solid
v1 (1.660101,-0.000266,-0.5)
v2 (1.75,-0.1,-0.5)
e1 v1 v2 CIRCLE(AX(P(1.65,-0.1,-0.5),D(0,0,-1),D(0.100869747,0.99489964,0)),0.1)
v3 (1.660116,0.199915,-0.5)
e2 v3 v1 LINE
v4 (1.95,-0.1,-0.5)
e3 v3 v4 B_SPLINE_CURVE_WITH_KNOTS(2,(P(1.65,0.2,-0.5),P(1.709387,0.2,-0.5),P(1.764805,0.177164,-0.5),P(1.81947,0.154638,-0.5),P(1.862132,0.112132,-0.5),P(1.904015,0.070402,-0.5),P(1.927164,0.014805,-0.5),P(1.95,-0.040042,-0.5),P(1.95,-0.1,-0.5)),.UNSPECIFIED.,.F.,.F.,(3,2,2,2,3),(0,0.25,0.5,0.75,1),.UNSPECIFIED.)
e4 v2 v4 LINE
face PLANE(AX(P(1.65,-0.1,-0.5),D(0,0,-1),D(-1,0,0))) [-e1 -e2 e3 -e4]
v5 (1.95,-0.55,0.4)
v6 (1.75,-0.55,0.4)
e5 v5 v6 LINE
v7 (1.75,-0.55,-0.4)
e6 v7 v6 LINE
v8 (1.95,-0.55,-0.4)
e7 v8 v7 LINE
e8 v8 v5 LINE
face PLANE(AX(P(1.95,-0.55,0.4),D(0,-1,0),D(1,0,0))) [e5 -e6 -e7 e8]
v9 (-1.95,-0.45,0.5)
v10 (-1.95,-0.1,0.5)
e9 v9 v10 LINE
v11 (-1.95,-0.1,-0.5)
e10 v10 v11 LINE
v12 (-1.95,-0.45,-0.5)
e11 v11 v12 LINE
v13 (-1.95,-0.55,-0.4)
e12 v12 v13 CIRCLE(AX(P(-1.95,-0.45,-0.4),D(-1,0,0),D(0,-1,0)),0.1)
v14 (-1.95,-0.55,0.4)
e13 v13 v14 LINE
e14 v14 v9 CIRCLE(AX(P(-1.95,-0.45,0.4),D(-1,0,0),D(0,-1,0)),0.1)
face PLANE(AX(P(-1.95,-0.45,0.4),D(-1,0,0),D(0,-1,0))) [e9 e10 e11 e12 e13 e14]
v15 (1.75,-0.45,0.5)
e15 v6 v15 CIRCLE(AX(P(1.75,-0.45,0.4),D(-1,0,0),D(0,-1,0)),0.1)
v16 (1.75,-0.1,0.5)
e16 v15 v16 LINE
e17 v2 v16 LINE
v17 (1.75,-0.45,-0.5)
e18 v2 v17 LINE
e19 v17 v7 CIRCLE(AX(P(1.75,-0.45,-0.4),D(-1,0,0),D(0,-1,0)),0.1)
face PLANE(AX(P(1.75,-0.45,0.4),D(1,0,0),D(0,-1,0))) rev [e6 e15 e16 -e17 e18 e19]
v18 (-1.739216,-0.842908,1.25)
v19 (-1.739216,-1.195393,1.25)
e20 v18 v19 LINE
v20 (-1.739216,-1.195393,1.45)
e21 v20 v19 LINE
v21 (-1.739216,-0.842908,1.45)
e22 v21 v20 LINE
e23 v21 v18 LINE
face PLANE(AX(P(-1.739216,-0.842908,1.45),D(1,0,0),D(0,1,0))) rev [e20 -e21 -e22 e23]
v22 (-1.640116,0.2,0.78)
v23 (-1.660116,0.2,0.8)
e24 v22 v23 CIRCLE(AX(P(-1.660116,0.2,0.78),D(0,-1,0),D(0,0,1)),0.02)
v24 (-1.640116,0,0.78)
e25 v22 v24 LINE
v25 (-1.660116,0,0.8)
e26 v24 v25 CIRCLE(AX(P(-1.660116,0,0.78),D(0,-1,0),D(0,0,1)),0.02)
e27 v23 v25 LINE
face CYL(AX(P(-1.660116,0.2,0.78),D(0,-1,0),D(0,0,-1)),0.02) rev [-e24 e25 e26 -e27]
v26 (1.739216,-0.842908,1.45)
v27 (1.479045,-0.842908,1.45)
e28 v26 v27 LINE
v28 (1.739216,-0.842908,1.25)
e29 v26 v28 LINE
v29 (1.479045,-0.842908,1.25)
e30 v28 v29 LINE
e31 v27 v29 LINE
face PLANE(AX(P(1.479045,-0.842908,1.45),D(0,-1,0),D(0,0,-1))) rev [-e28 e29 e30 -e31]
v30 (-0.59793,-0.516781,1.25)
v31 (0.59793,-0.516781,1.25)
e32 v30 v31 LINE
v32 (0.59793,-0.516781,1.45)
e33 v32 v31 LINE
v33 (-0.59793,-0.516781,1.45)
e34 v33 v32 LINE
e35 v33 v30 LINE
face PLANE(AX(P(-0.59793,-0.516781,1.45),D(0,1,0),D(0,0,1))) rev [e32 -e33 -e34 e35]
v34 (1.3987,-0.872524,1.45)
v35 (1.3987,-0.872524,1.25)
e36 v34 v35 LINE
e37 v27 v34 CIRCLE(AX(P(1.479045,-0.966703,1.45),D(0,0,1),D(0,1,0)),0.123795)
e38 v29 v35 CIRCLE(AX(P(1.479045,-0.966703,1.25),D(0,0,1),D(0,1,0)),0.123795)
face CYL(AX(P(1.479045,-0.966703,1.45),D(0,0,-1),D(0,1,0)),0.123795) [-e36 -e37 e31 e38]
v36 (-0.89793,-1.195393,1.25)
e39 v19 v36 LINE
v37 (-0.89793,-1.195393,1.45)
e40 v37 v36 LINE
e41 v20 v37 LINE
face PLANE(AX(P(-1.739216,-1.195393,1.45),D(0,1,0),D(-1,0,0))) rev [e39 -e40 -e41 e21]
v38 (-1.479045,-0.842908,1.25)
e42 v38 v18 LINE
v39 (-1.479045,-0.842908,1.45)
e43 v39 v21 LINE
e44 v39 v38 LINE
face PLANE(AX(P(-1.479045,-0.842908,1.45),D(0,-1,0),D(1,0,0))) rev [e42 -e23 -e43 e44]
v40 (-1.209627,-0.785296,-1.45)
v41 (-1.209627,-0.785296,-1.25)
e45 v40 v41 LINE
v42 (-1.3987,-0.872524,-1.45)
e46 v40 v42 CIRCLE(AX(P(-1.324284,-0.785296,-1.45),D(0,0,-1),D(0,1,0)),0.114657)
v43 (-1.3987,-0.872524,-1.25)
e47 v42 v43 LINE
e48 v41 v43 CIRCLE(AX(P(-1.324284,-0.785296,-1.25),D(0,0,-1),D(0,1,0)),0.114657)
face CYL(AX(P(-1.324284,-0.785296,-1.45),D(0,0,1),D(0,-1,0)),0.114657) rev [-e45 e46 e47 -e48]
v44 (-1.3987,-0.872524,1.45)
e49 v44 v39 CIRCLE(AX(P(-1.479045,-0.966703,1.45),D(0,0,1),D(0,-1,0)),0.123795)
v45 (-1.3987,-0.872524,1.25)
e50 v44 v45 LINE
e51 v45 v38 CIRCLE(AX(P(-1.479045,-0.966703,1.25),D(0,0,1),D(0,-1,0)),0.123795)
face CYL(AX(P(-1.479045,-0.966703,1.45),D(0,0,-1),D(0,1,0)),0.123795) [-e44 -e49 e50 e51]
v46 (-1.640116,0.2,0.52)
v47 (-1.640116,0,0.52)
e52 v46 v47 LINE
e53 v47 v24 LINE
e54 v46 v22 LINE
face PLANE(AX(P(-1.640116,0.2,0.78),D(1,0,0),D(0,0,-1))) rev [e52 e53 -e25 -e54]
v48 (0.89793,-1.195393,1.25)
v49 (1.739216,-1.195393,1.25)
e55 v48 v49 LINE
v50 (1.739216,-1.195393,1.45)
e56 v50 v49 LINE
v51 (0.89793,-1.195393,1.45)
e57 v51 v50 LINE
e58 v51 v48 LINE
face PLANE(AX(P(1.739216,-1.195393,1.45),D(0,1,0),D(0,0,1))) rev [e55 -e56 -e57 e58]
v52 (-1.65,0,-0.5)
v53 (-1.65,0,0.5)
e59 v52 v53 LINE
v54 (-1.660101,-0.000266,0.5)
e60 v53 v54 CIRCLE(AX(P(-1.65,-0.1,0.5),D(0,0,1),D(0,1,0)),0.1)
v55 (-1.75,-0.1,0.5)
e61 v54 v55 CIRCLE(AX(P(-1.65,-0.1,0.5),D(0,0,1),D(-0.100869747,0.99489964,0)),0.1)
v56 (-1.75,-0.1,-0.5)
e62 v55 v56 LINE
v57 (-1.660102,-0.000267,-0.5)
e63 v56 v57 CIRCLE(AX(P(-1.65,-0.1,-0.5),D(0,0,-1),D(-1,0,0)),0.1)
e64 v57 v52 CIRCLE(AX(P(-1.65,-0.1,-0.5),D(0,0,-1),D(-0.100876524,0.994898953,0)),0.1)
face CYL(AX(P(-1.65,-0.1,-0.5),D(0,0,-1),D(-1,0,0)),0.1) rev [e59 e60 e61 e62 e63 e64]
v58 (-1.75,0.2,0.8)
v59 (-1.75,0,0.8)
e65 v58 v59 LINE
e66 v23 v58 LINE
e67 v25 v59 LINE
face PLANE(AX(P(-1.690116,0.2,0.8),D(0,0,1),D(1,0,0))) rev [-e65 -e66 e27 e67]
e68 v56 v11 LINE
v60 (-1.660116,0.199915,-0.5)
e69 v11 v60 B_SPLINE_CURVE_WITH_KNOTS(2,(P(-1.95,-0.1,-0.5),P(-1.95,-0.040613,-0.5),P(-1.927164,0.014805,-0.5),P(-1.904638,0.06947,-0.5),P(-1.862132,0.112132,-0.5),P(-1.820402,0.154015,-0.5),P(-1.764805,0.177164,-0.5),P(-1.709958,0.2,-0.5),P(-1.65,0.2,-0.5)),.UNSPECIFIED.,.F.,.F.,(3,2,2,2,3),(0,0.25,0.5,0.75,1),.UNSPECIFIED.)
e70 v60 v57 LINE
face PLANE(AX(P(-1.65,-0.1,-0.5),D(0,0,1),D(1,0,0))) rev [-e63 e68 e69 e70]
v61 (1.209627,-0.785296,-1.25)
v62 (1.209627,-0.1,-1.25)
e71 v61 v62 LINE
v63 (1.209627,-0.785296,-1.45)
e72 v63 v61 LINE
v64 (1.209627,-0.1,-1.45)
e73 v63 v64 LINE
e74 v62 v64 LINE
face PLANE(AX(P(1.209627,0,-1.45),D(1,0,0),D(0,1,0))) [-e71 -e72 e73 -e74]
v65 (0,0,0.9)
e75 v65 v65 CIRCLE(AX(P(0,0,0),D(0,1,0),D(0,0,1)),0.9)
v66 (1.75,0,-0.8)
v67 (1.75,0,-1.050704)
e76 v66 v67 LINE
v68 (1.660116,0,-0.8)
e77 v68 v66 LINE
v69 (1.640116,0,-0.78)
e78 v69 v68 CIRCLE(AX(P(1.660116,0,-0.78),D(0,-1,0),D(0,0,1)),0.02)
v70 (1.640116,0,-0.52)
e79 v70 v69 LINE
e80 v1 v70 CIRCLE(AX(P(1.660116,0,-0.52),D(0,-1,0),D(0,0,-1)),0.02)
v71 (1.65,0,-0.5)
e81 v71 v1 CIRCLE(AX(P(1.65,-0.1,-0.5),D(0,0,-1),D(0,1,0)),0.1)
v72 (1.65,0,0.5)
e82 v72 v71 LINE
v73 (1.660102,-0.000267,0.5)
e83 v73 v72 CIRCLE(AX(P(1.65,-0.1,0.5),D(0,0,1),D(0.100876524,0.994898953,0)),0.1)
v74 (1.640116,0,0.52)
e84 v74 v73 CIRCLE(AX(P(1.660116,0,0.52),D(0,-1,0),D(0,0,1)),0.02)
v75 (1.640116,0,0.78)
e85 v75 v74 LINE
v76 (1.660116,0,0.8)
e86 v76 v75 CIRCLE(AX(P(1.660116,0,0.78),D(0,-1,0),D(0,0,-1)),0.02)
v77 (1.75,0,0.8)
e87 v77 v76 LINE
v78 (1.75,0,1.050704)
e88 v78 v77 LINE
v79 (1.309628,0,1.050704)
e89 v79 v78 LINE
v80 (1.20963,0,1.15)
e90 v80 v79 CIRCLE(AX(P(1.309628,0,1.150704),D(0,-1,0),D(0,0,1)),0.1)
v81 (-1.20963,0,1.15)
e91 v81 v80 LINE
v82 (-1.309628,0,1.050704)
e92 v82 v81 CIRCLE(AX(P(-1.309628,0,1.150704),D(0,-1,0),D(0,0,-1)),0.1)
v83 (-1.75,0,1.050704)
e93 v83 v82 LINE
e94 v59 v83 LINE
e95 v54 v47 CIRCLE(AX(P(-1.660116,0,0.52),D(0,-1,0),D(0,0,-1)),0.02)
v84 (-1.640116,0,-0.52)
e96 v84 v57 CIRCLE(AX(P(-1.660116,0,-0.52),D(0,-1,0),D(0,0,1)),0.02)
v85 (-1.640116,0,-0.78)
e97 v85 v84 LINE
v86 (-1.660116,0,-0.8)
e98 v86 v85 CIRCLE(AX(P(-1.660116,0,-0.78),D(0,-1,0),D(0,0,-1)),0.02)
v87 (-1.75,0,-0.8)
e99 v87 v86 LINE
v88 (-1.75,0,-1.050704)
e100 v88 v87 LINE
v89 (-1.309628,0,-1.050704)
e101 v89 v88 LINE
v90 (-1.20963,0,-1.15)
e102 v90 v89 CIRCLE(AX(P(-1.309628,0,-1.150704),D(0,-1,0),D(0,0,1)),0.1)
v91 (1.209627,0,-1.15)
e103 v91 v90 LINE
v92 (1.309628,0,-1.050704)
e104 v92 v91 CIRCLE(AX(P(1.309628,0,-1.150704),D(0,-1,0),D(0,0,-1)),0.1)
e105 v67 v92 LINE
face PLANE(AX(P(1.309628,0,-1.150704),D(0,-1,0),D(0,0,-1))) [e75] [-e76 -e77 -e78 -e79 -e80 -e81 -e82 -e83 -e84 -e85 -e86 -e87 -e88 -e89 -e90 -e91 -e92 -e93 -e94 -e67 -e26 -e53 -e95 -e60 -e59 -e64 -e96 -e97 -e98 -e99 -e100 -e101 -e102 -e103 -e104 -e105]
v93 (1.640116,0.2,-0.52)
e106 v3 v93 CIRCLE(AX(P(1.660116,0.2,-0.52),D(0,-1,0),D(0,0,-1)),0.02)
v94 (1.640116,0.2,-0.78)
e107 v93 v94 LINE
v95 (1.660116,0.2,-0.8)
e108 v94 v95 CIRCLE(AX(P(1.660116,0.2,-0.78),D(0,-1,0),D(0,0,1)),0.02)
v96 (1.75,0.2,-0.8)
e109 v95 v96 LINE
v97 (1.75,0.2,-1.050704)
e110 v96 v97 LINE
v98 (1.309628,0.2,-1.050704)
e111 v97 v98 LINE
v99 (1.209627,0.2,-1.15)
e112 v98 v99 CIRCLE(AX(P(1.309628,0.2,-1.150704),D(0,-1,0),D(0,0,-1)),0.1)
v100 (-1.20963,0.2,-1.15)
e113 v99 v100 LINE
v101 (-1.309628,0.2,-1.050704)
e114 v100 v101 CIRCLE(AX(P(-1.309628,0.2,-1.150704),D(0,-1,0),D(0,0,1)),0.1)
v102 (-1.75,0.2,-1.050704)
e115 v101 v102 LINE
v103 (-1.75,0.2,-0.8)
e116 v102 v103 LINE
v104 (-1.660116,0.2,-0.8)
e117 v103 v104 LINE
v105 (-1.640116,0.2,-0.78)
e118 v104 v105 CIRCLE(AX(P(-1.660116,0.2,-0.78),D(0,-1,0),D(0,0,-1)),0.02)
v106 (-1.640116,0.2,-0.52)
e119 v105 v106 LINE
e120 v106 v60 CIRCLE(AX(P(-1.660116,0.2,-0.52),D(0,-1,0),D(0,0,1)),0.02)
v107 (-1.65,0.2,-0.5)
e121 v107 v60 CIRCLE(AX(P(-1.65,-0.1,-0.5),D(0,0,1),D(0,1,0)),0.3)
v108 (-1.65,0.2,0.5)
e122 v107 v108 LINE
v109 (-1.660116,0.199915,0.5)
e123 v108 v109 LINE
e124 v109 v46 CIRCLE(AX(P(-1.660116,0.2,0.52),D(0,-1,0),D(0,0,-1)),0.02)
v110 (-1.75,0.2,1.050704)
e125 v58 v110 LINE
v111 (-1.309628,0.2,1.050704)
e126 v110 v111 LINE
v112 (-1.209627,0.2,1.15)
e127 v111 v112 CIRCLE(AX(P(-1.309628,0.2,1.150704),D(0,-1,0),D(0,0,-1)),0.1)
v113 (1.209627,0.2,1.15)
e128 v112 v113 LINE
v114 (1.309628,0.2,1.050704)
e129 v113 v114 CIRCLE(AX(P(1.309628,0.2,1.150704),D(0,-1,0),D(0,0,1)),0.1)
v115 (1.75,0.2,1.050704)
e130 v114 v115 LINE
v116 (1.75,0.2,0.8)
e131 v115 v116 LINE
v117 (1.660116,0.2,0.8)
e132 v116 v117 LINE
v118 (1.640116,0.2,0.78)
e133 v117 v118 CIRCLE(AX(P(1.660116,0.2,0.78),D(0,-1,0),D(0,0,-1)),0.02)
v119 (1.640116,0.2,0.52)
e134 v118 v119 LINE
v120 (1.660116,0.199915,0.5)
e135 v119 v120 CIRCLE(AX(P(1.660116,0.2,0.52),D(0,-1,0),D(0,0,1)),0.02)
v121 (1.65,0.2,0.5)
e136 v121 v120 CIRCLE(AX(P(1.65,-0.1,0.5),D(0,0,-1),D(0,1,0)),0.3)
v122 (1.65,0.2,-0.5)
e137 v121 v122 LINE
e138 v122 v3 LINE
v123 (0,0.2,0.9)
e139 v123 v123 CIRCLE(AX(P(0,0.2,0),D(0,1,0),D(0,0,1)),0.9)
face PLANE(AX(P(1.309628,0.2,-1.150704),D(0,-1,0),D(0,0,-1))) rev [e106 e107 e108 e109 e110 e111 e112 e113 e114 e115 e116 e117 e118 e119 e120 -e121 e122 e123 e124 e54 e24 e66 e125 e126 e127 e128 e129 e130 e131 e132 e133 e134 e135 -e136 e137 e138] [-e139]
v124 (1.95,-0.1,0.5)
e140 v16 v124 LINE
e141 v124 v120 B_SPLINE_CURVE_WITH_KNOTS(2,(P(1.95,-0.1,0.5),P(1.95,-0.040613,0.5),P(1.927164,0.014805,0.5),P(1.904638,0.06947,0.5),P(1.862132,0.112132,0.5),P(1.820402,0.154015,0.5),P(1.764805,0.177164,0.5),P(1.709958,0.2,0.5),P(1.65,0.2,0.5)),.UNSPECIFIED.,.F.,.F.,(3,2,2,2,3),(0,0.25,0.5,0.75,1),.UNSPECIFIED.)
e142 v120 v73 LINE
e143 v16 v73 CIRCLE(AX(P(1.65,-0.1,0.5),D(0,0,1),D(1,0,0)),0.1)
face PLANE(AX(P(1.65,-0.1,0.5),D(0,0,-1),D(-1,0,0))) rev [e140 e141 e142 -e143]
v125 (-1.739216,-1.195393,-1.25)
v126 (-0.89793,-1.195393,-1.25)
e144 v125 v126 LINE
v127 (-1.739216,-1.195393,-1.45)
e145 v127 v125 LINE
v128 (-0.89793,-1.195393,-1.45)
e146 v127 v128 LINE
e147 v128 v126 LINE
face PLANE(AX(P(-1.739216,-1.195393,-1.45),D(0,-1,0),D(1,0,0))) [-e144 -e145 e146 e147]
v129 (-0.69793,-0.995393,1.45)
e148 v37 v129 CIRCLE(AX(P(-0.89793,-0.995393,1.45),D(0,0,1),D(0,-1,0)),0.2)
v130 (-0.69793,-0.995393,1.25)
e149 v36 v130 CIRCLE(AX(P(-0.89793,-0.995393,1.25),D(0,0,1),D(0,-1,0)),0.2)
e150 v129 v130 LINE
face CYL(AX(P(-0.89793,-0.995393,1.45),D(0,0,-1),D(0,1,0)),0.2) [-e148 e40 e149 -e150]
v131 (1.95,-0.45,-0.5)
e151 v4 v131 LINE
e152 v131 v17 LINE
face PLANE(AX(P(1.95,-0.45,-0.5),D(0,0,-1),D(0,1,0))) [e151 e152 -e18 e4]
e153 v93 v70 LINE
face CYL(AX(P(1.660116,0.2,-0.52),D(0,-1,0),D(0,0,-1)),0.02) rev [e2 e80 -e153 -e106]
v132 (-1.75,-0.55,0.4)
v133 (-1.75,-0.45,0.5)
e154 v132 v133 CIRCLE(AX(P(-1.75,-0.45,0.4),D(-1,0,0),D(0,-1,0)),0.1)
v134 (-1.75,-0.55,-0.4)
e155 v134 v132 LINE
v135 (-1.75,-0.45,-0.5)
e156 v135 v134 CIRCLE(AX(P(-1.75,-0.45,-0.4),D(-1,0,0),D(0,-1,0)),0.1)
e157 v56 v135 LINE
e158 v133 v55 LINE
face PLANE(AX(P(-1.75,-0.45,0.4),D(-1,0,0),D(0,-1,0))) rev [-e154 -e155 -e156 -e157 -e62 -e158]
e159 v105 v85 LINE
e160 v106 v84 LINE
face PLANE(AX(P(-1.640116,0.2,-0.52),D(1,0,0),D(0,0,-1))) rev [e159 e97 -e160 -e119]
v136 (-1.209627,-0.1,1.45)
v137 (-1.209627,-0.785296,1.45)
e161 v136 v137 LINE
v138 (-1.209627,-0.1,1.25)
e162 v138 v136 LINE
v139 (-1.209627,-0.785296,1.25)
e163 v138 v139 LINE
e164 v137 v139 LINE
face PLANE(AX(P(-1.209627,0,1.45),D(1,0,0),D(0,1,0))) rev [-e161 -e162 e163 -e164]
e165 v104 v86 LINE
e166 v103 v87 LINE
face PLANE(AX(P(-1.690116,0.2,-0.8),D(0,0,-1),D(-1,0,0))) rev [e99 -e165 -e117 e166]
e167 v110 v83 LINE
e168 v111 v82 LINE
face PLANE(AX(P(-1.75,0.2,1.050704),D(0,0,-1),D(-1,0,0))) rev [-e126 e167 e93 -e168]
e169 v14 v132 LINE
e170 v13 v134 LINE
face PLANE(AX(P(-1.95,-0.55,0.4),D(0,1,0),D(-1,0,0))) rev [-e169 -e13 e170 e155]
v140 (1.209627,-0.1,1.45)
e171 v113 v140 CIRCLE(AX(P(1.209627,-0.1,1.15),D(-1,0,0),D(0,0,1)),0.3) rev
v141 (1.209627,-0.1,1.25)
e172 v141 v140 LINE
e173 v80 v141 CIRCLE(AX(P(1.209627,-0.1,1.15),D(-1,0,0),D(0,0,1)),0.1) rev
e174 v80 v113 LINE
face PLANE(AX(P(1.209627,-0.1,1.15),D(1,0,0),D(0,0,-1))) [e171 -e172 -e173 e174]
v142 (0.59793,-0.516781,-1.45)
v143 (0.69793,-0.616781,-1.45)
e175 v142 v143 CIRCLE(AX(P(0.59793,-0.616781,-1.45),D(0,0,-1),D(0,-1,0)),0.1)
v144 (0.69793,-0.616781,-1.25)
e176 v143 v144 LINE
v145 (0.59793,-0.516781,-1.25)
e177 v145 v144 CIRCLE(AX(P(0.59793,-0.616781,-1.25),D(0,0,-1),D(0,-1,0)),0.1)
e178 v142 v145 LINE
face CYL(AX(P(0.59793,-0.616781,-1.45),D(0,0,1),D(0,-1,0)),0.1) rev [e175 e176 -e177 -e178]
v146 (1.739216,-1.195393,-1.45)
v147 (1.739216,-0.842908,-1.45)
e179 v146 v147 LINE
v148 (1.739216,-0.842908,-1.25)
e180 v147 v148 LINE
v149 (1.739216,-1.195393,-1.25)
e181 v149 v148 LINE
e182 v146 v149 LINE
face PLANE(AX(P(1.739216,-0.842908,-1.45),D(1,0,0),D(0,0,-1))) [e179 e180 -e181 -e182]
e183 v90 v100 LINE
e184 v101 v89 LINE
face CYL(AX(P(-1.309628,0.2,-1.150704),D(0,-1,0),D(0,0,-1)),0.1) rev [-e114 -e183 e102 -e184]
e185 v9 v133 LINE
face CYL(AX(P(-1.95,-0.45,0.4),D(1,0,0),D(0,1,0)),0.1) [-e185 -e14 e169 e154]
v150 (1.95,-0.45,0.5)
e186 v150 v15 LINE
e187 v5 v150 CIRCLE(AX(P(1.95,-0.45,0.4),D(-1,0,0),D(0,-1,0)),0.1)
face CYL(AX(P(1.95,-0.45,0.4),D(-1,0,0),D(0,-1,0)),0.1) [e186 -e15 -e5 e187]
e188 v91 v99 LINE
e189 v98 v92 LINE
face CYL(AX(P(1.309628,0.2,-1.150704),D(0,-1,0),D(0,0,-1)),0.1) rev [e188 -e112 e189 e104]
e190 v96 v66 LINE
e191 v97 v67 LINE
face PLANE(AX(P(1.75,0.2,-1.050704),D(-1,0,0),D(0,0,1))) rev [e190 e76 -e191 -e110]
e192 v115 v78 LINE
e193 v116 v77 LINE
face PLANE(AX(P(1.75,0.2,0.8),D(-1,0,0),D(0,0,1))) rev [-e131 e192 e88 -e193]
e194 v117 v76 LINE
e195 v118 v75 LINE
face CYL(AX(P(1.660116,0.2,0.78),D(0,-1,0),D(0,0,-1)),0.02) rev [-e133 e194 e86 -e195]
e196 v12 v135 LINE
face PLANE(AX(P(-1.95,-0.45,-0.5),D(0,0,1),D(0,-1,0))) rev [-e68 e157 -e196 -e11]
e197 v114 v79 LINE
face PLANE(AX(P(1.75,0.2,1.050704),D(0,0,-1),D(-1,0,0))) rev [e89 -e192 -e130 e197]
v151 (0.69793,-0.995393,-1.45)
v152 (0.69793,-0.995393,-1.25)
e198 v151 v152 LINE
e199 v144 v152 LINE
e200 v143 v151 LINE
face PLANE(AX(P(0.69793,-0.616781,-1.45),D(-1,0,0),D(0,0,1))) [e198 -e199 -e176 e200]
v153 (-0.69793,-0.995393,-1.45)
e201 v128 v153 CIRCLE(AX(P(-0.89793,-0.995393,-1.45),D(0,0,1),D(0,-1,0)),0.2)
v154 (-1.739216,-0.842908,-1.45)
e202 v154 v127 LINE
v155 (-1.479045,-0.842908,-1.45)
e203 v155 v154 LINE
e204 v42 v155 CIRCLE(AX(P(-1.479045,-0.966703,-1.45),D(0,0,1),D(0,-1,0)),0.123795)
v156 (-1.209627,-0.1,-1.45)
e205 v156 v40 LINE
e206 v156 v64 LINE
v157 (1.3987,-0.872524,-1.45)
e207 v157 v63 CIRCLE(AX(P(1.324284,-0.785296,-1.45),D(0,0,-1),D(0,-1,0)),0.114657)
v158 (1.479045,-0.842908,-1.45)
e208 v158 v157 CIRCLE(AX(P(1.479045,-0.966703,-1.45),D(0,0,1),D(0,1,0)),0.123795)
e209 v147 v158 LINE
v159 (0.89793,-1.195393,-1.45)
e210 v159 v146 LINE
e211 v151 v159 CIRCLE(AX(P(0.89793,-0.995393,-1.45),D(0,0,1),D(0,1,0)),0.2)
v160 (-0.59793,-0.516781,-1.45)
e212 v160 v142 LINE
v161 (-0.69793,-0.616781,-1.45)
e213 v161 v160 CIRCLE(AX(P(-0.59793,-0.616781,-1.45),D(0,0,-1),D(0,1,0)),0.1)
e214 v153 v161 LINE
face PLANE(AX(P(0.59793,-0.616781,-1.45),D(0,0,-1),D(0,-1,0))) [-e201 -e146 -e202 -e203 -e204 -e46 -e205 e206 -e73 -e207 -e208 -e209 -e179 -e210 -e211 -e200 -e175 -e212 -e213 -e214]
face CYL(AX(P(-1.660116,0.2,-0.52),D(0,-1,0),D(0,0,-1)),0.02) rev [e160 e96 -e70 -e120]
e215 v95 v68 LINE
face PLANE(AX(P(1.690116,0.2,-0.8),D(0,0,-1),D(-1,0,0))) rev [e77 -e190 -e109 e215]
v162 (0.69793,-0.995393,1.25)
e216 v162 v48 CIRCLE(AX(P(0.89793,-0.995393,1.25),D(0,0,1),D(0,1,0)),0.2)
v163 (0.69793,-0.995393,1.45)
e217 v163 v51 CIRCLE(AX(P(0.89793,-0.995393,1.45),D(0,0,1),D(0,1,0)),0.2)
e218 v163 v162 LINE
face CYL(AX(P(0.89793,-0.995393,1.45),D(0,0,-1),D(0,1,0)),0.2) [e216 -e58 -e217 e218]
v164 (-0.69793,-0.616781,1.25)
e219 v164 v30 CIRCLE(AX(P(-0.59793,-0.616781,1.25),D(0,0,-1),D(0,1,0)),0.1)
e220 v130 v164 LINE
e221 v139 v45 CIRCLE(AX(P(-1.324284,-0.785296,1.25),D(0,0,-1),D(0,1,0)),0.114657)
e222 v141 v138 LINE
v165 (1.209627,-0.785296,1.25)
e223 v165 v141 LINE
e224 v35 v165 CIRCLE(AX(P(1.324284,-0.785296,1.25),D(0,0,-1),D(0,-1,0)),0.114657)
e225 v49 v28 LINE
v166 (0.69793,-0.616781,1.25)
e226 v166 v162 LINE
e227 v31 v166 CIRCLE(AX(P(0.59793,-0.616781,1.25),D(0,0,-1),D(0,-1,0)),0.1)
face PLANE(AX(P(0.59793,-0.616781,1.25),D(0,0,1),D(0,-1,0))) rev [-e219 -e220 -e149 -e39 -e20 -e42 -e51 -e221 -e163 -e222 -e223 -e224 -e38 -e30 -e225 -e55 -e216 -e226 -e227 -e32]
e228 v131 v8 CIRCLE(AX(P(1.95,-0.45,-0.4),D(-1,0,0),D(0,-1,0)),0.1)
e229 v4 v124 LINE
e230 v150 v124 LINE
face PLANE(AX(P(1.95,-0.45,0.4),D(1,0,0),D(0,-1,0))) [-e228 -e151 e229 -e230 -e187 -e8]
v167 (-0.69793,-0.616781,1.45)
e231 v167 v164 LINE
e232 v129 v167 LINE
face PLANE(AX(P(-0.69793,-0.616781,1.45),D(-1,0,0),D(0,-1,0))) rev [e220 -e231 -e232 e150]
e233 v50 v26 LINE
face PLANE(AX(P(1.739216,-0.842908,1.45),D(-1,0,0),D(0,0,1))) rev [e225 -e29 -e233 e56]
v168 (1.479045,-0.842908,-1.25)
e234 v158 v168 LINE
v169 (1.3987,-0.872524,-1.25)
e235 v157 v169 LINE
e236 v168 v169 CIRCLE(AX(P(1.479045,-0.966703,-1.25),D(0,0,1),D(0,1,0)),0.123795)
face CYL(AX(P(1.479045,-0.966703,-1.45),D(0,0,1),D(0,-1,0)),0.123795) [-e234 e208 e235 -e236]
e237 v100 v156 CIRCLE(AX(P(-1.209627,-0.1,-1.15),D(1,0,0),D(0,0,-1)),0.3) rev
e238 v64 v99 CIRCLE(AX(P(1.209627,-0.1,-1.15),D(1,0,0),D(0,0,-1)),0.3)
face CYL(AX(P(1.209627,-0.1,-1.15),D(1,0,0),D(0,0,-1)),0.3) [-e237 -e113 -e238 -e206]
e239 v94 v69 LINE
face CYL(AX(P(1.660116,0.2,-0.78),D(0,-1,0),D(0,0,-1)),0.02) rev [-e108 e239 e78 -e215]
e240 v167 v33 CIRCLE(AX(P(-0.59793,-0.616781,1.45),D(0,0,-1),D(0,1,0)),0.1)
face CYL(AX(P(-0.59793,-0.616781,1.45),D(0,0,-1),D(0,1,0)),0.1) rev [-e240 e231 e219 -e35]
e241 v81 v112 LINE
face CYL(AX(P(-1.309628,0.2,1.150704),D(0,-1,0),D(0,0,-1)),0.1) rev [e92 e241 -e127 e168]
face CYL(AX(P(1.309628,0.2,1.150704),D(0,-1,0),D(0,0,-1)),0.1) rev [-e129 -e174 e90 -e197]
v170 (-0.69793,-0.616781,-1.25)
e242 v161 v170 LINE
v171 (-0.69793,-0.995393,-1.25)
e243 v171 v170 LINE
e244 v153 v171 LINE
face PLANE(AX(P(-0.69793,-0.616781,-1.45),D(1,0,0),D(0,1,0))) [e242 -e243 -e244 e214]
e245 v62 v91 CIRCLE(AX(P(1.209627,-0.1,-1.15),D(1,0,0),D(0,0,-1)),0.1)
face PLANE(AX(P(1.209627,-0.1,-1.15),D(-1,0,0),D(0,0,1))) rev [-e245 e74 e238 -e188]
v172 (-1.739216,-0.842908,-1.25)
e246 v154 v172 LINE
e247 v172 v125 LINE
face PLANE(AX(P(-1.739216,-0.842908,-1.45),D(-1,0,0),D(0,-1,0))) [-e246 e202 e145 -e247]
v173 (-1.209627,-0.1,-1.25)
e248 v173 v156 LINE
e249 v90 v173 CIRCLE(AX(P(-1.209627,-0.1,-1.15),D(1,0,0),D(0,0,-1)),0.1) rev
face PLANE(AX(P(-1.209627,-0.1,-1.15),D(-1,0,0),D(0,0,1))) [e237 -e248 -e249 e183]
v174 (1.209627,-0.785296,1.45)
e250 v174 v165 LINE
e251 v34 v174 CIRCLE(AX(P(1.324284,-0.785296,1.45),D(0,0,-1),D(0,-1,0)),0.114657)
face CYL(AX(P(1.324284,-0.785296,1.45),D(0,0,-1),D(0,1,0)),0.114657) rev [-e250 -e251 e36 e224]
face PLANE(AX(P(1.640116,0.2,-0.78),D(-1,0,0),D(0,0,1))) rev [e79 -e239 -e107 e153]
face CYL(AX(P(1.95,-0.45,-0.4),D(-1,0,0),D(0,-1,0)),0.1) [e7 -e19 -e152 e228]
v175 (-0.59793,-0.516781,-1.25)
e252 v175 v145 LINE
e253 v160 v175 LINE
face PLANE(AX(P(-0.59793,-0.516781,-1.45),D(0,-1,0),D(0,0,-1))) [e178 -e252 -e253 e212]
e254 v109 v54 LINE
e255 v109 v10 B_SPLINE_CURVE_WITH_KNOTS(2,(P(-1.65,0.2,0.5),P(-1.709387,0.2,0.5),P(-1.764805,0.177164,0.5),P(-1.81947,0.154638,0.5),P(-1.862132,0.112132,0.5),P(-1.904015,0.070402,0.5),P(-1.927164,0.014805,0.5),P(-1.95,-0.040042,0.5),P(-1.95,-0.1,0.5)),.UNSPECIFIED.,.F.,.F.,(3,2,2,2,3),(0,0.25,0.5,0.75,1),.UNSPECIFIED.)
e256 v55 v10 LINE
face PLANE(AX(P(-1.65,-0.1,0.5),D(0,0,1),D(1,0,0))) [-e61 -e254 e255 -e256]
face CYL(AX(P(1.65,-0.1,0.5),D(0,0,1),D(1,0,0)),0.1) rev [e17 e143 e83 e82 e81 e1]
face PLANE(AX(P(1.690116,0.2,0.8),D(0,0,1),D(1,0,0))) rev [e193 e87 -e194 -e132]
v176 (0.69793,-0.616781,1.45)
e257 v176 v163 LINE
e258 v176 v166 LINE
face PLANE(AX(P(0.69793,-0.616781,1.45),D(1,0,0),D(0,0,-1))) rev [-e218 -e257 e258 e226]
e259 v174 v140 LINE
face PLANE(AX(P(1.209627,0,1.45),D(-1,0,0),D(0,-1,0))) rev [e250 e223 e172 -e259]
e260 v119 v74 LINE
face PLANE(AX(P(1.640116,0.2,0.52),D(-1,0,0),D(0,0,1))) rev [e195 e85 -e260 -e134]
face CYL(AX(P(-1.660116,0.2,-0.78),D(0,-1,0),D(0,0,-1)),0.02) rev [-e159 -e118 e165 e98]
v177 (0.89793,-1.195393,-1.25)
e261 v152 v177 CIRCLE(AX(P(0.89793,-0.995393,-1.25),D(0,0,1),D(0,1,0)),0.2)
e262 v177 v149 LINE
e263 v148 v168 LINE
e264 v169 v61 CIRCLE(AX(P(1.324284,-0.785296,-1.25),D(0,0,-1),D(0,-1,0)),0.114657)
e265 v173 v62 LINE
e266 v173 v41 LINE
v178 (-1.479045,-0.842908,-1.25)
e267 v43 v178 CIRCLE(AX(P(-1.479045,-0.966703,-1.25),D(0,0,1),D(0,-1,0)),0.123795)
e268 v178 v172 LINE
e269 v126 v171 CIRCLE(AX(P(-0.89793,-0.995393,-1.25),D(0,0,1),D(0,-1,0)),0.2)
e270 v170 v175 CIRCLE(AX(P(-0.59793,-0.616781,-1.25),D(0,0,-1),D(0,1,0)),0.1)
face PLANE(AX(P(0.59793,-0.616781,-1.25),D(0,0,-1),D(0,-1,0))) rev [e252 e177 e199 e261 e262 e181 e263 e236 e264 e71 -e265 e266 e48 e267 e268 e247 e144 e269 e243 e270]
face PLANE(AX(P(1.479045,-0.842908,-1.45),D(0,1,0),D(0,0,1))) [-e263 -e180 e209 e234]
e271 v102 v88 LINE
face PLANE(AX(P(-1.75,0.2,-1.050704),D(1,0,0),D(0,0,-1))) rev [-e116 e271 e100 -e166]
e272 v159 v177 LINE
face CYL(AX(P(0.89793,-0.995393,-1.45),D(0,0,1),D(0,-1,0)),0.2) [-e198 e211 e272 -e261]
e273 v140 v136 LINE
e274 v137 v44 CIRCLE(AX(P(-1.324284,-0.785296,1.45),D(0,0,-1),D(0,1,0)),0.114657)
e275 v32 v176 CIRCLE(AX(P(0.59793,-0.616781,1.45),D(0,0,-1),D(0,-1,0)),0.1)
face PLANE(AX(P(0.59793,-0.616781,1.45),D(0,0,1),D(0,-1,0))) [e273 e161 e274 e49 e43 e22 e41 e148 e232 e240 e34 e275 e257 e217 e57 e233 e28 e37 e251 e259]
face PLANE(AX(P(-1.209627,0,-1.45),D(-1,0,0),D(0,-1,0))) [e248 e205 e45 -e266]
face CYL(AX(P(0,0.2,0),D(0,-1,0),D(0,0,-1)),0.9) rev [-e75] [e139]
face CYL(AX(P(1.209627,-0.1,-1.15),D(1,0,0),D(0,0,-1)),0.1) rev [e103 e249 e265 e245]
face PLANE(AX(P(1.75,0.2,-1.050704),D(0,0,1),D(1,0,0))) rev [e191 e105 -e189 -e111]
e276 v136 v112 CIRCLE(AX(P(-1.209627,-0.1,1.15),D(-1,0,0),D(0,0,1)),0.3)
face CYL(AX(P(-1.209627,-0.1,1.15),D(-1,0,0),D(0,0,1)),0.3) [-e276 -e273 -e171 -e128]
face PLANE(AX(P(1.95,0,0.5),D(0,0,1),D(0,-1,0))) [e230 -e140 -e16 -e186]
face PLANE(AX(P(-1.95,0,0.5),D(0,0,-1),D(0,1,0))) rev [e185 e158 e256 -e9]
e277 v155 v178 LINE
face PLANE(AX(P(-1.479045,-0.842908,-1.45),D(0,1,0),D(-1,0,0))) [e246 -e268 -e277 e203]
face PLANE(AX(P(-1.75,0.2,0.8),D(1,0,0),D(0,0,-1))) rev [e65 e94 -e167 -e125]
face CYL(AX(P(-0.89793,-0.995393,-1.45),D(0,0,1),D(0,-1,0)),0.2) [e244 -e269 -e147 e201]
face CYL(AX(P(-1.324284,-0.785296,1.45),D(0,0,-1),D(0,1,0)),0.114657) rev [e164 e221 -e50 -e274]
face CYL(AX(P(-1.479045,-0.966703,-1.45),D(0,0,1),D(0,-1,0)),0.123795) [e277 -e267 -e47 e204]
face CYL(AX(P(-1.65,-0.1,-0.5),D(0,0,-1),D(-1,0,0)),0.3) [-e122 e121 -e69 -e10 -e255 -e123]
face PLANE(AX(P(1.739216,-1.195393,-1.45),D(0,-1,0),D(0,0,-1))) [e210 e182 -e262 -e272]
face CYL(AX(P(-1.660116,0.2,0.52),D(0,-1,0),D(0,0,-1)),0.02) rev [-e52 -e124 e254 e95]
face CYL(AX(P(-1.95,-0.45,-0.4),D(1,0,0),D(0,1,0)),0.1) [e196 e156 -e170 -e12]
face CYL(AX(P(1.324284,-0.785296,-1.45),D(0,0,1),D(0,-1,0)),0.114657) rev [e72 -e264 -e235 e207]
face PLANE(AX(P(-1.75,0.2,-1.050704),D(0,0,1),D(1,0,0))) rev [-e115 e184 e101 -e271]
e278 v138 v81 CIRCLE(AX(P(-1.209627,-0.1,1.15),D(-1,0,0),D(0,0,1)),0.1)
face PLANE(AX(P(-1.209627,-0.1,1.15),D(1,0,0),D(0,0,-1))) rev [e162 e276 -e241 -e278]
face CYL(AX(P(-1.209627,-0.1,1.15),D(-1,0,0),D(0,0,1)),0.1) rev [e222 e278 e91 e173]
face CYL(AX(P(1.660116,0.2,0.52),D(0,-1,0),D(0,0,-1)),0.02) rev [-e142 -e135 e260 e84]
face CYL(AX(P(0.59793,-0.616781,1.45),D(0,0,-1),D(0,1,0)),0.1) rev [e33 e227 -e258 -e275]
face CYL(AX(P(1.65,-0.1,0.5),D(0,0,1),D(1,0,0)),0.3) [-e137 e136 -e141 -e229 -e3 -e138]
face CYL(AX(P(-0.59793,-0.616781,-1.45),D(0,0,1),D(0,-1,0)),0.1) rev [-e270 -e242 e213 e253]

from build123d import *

# Parameters (mm, degrees)
SKETCH_3_R                       = 0.9
SM_BASE_FLANGE_1_DEPTH           = 0.2
SM_EDGE_FLANGE_3_DEPTH           = 0.169178
SM_START                         = 1.15
SM_EDGE_FLANGE_3_2_DEPTH         = 0.3
SM_START_2                       = -1.739216372
SM_EDGE_FLANGE_3_3_DEPTH         = 3.478432744
SM_START_3                       = -1.209627878
SM_EDGE_FLANGE_3_4_DEPTH         = 2.419255168
SM_EDGE_FLANGE_4_STRIP_W         = 1
SM_EDGE_FLANGE_4_STRIP_H         = 0.2
SM_EDGE_FLANGE_4_STRIP_CUT_DEPTH = 1
SM_EDGE_FLANGE_4_DEPTH           = 1
SM_START_4                       = 0.2
SM_EDGE_FLANGE_4_FLAT_DEPTH      = 0.2


with BuildPart() as part:
    # 基体-法兰1: sheet metal written as solids
    # 草图3 → 基体-法兰1 (new body)
    with BuildSketch(Plane(origin=(0, 0, 0), x_dir=(1, 0, 0), z_dir=(0, 1, 0))):
        with BuildLine():
            Line((1.75, 0.5), (1.75, -0.5))
            Line((1.75, -0.5), (1.690116035, -0.5))
            Line((1.690116035, -0.5), (1.660116035, -0.5))
            ThreePointArc((1.660116035, -0.5), (1.645973899, -0.505857864), (1.640116035, -0.52))
            Line((1.640116035, -0.52), (1.640116035, -0.55))
            Line((1.640116035, -0.55), (1.640116035, -0.75))
            Line((1.640116035, -0.75), (1.640116035, -0.78))
            ThreePointArc((1.640116035, -0.78), (1.645973899, -0.794142136), (1.660116035, -0.8))
            Line((1.660116035, -0.8), (1.690116035, -0.8))
            Line((1.690116035, -0.8), (1.75, -0.8))
            Line((1.75, -0.8), (1.75, -1.050703944))
            Line((1.75, -1.050703944), (1.309627878, -1.050703944))
            ThreePointArc((1.309627878, -1.050703944), (1.2389172, -1.079993266), (1.209627878, -1.150703944))
            Line((1.209627878, -1.150703944), (1.209627878, -1.244254067))
            Line((1.209627878, -1.244254067), (1.209627878, -1.25))
            Line((1.209627878, -1.25), (1.121614786, -1.25))
            Line((1.121614786, -1.25), (-1.121614786, -1.25))
            Line((-1.121614786, -1.25), (-1.209627878, -1.25))
            Line((-1.209627878, -1.25), (-1.209627878, -1.244254067))
            Line((-1.209627878, -1.244254067), (-1.209627878, -1.150703944))
            ThreePointArc((-1.209627878, -1.150703944), (-1.2389172, -1.079993266), (-1.309627878, -1.050703944))
            Line((-1.309627878, -1.050703944), (-1.75, -1.050703944))
            Line((-1.75, -1.050703944), (-1.75, -0.8))
            Line((-1.75, -0.8), (-1.690116035, -0.8))
            Line((-1.690116035, -0.8), (-1.660116035, -0.8))
            ThreePointArc((-1.660116035, -0.8), (-1.645973899, -0.794142136), (-1.640116035, -0.78))
            Line((-1.640116035, -0.78), (-1.640116035, -0.75))
            Line((-1.640116035, -0.75), (-1.640116035, -0.55))
            Line((-1.640116035, -0.55), (-1.640116035, -0.52))
            ThreePointArc((-1.640116035, -0.52), (-1.645973899, -0.505857864), (-1.660116035, -0.5))
            Line((-1.660116035, -0.5), (-1.690116035, -0.5))
            Line((-1.690116035, -0.5), (-1.75, -0.5))
            Line((-1.75, -0.5), (-1.75, 0.5))
            Line((-1.75, 0.5), (-1.690116035, 0.5))
            Line((-1.690116035, 0.5), (-1.660116035, 0.5))
            ThreePointArc((-1.660116035, 0.5), (-1.645973899, 0.505857864), (-1.640116035, 0.52))
            Line((-1.640116035, 0.52), (-1.640116035, 0.55))
            Line((-1.640116035, 0.55), (-1.640116035, 0.75))
            Line((-1.640116035, 0.75), (-1.640116035, 0.78))
            ThreePointArc((-1.640116035, 0.78), (-1.645973899, 0.794142136), (-1.660116035, 0.8))
            Line((-1.660116035, 0.8), (-1.690116035, 0.8))
            Line((-1.690116035, 0.8), (-1.75, 0.8))
            Line((-1.75, 0.8), (-1.75, 1.050703944))
            Line((-1.75, 1.050703944), (-1.309627878, 1.050703944))
            ThreePointArc((-1.309627878, 1.050703944), (-1.2389172, 1.079993266), (-1.209627878, 1.150703944))
            Line((-1.209627878, 1.150703944), (-1.209627878, 1.244254067))
            Line((-1.209627878, 1.244254067), (-1.209627878, 1.25))
            Line((-1.209627878, 1.25), (-1.121614786, 1.25))
            Line((-1.121614786, 1.25), (1.121614786, 1.25))
            Line((1.121614786, 1.25), (1.209627878, 1.25))
            Line((1.209627878, 1.25), (1.209627878, 1.244254067))
            Line((1.209627878, 1.244254067), (1.209627878, 1.150703944))
            ThreePointArc((1.209627878, 1.150703944), (1.2389172, 1.079993266), (1.309627878, 1.050703944))
            Line((1.309627878, 1.050703944), (1.75, 1.050703944))
            Line((1.75, 1.050703944), (1.75, 0.8))
            Line((1.75, 0.8), (1.690116035, 0.8))
            Line((1.690116035, 0.8), (1.660116035, 0.8))
            ThreePointArc((1.660116035, 0.8), (1.645973899, 0.794142136), (1.640116035, 0.78))
            Line((1.640116035, 0.78), (1.640116035, 0.75))
            Line((1.640116035, 0.75), (1.640116035, 0.55))
            Line((1.640116035, 0.55), (1.640116035, 0.52))
            ThreePointArc((1.640116035, 0.52), (1.645973899, 0.505857864), (1.660116035, 0.5))
            Line((1.660116035, 0.5), (1.690116035, 0.5))
            Line((1.690116035, 0.5), (1.75, 0.5))
        make_face()
        with Locations(Location((0, 0, 0), (0, 0, 270))):
            Circle(SKETCH_3_R, mode=Mode.SUBTRACT)
    extrude(amount=SM_BASE_FLANGE_1_DEPTH)

    # 边线-法兰3: read off the stored shape, not the designer's step
    # 边线-法兰3 outline → 边线-法兰3 (add)
    with BuildSketch(Plane(origin=(0, 0, 1.25), x_dir=(-1, 0, 0), z_dir=(0, 0, 1))):
        with BuildLine():
            Line((-1.20962729, 0.785296441), (-1.209627878, 0))
            Line((-1.209627878, 0), (1.209627878, 0))
            Line((1.209627878, 0), (1.20962729, 0.785296441))
            ThreePointArc((1.20962729, 0.785296441), (1.276253046, 0.889408078), (1.398699548, 0.872523806))
            ThreePointArc((1.398699548, 0.872523806), (1.436230193, 0.850547775), (1.479045273, 0.842908124))
            Line((1.479045273, 0.842908124), (1.739216372, 0.842908124))
            Line((1.739216372, 0.842908124), (1.739216372, 1.195393252))
            Line((1.739216372, 1.195393252), (0.897930032, 1.195393252))
            ThreePointArc((0.897930032, 1.195393252), (0.756508676, 1.136814608), (0.697930032, 0.995393252))
            Line((0.697930032, 0.995393252), (0.697930032, 0.616780813))
            ThreePointArc((0.697930032, 0.616780813), (0.66864071, 0.546070134), (0.597930032, 0.516780813))
            Line((0.597930032, 0.516780813), (-0.597930032, 0.516780813))
            ThreePointArc((-0.597930032, 0.516780813), (-0.66864071, 0.546070135), (-0.697930032, 0.616780813))
            Line((-0.697930032, 0.616780813), (-0.697930032, 0.995393252))
            ThreePointArc((-0.697930032, 0.995393252), (-0.756508676, 1.136814608), (-0.897930032, 1.195393252))
            Line((-0.897930032, 1.195393252), (-1.739216372, 1.195393252))
            Line((-1.739216372, 1.195393252), (-1.739216372, 0.842908124))
            Line((-1.739216372, 0.842908124), (-1.479045273, 0.842908124))
            ThreePointArc((-1.479045273, 0.842908124), (-1.436230193, 0.850547775), (-1.398699548, 0.872523806))
            ThreePointArc((-1.398699548, 0.872523806), (-1.276253046, 0.889408078), (-1.20962729, 0.785296441))
        make_face()
    sm_edge_flange_3 = extrude(amount=SM_EDGE_FLANGE_3_DEPTH)

    # Sm Edge Flange 3 2 outline → Sm Edge Flange 3 2 (add)
    with BuildSketch(Plane.XY.offset(SM_START)):
        with BuildLine():
            Line((1.20962729, -0.785296441), (1.209627878, 0))
            Line((1.209627878, 0), (-1.209627878, 0))
            Line((-1.209627878, 0), (-1.20962729, -0.785296441))
            ThreePointArc((-1.20962729, -0.785296441), (-1.276253046, -0.889408078), (-1.398699548, -0.872523806))
            ThreePointArc((-1.398699548, -0.872523806), (-1.436230193, -0.850547775), (-1.479045273, -0.842908124))
            Line((-1.479045273, -0.842908124), (-1.739216372, -0.842908124))
            Line((-1.739216372, -0.842908124), (-1.739216372, -1.195393252))
            Line((-1.739216372, -1.195393252), (-0.897930032, -1.195393252))
            ThreePointArc((-0.897930032, -1.195393252), (-0.756508676, -1.136814608), (-0.697930032, -0.995393252))
            Line((-0.697930032, -0.995393252), (-0.697930032, -0.616780813))
            ThreePointArc((-0.697930032, -0.616780813), (-0.66864071, -0.546070134), (-0.597930032, -0.516780813))
            Line((-0.597930032, -0.516780813), (0.597930032, -0.516780813))
            ThreePointArc((0.597930032, -0.516780813), (0.66864071, -0.546070135), (0.697930032, -0.616780813))
            Line((0.697930032, -0.616780813), (0.697930032, -0.995393252))
            ThreePointArc((0.697930032, -0.995393252), (0.756508676, -1.136814608), (0.897930032, -1.195393252))
            Line((0.897930032, -1.195393252), (1.739216372, -1.195393252))
            Line((1.739216372, -1.195393252), (1.739216372, -0.842908124))
            Line((1.739216372, -0.842908124), (1.479045273, -0.842908124))
            ThreePointArc((1.479045273, -0.842908124), (1.436230193, -0.850547775), (1.398699548, -0.872523806))
            ThreePointArc((1.398699548, -0.872523806), (1.276253046, -0.889408078), (1.20962729, -0.785296441))
        make_face()
    sm_edge_flange_3_2 = extrude(amount=SM_EDGE_FLANGE_3_2_DEPTH)

    # Sm Edge Flange 3 3 outline → Sm Edge Flange 3 3 (cut)
    with BuildSketch(Plane.YZ.offset(SM_START_2)):
        with BuildLine():
            Line((0, 1.45), (-0.1, 1.45))
            ThreePointArc((-0.1, 1.45), (-0.049269406, 1.445679568), (0, 1.432842712))
            Line((0, 1.432842712), (0, 1.45))
        make_face()
        with BuildLine():
            Line((0.2, 1.25), (0.182842712, 1.25))
            ThreePointArc((0.182842712, 1.25), (0.195679568, 1.200730594), (0.2, 1.15))
            Line((0.2, 1.15), (0.2, 1.25))
        make_face()
        with BuildLine():
            ThreePointArc((0, 1.15), (-0.029289322, 1.220710678), (-0.1, 1.25))
            Line((-0.1, 1.25), (-1.195393252, 1.25))
            Line((-1.195393252, 1.25), (-1.195393252, 1.15))
            Line((-1.195393252, 1.15), (0, 1.15))
        make_face()
    sm_edge_flange_3_3 = extrude(amount=SM_EDGE_FLANGE_3_3_DEPTH, mode=Mode.SUBTRACT)

    # Sm Edge Flange 3 4 outline → Sm Edge Flange 3 4 (add)
    with BuildSketch(Plane.YZ.offset(SM_START_3)):
        with BuildLine():
            ThreePointArc((0.182842712, 1.25), (0.112132034, 1.362132034), (0, 1.432842712))
            Line((0, 1.432842712), (0, 1.25))
            Line((0, 1.25), (0.182842712, 1.25))
        make_face()
    sm_edge_flange_3_4 = extrude(amount=SM_EDGE_FLANGE_3_4_DEPTH)

    # 镜向2: 边线-法兰3, Sm Edge Flange 3 2, Sm Edge Flange 3 3, Sm Edge Flange 3 4 across plane
    add(sm_edge_flange_3.mirror(Plane.XY))
    add(sm_edge_flange_3_2.mirror(Plane.XY))
    add(sm_edge_flange_3_3.mirror(Plane.XY), mode=Mode.SUBTRACT)
    add(sm_edge_flange_3_4.mirror(Plane.XY))

    # 边线-法兰4: sheet metal written as solids
    # 边线-法兰4 strip (on a plane across the edge) → 边线-法兰4 strip cut (cut)
    with BuildSketch(Plane(origin=(-1.75, 0, 0.5), x_dir=(1, 0, 0), z_dir=(0, 0, -1))):
        with Locations((-0.4, -0.1)):
            Rectangle(SM_EDGE_FLANGE_4_STRIP_W, SM_EDGE_FLANGE_4_STRIP_H)
    sm_edge_flange_4_strip_cut = extrude(amount=SM_EDGE_FLANGE_4_STRIP_CUT_DEPTH, mode=Mode.SUBTRACT)

    # 边线-法兰4 bend section (on a plane across the edge) → 边线-法兰4 (add)
    with BuildSketch(Plane(origin=(-1.75, 0, 0.5), x_dir=(1, 0, 0), z_dir=(0, 0, -1))):
        with BuildLine():
            Line((-0.2, 0.1), (0, 0.1))
            ThreePointArc((0, 0.1), (0.029289322, 0.029289322), (0.1, 0))
            Line((0.1, 0), (0.1, -0.2))
            ThreePointArc((0.1, -0.2), (-0.112132034, -0.112132034), (-0.2, 0.1))
        make_face()
    sm_edge_flange_4 = extrude(amount=SM_EDGE_FLANGE_4_DEPTH)

    # 边线-法兰4 profile (on flange) → 边线-法兰4 flat (add)
    with BuildSketch(Plane(origin=(-1.75, 0, 0), x_dir=(0, 0, -1), z_dir=(-1, 0, 0)).offset(SM_START_4)):
        with BuildLine():
            Line((0.5, 0.1), (0.5, 0.45))
            ThreePointArc((0.5, 0.45), (0.470710678, 0.520710678), (0.4, 0.55))
            Line((0.4, 0.55), (-0.4, 0.55))
            ThreePointArc((-0.4, 0.55), (-0.470710678, 0.520710678), (-0.5, 0.45))
            Line((-0.5, 0.45), (-0.5, 0.1))
            Line((-0.5, 0.1), (0.5, 0.1))
        make_face()
    sm_edge_flange_4_flat = extrude(amount=-SM_EDGE_FLANGE_4_FLAT_DEPTH)

    # 镜向3: 边线-法兰4 strip cut, 边线-法兰4, 边线-法兰4 flat across plane
    add(sm_edge_flange_4_strip_cut.mirror(Plane(origin=(0, 0, 0), x_dir=(0, 0, 1), z_dir=(1, 0, 0))), mode=Mode.SUBTRACT)
    add(sm_edge_flange_4.mirror(Plane(origin=(0, 0, 0), x_dir=(0, 0, 1), z_dir=(1, 0, 0))))
    add(sm_edge_flange_4_flat.mirror(Plane(origin=(0, 0, 0), x_dir=(0, 0, 1), z_dir=(1, 0, 0))))


solid = part.part
